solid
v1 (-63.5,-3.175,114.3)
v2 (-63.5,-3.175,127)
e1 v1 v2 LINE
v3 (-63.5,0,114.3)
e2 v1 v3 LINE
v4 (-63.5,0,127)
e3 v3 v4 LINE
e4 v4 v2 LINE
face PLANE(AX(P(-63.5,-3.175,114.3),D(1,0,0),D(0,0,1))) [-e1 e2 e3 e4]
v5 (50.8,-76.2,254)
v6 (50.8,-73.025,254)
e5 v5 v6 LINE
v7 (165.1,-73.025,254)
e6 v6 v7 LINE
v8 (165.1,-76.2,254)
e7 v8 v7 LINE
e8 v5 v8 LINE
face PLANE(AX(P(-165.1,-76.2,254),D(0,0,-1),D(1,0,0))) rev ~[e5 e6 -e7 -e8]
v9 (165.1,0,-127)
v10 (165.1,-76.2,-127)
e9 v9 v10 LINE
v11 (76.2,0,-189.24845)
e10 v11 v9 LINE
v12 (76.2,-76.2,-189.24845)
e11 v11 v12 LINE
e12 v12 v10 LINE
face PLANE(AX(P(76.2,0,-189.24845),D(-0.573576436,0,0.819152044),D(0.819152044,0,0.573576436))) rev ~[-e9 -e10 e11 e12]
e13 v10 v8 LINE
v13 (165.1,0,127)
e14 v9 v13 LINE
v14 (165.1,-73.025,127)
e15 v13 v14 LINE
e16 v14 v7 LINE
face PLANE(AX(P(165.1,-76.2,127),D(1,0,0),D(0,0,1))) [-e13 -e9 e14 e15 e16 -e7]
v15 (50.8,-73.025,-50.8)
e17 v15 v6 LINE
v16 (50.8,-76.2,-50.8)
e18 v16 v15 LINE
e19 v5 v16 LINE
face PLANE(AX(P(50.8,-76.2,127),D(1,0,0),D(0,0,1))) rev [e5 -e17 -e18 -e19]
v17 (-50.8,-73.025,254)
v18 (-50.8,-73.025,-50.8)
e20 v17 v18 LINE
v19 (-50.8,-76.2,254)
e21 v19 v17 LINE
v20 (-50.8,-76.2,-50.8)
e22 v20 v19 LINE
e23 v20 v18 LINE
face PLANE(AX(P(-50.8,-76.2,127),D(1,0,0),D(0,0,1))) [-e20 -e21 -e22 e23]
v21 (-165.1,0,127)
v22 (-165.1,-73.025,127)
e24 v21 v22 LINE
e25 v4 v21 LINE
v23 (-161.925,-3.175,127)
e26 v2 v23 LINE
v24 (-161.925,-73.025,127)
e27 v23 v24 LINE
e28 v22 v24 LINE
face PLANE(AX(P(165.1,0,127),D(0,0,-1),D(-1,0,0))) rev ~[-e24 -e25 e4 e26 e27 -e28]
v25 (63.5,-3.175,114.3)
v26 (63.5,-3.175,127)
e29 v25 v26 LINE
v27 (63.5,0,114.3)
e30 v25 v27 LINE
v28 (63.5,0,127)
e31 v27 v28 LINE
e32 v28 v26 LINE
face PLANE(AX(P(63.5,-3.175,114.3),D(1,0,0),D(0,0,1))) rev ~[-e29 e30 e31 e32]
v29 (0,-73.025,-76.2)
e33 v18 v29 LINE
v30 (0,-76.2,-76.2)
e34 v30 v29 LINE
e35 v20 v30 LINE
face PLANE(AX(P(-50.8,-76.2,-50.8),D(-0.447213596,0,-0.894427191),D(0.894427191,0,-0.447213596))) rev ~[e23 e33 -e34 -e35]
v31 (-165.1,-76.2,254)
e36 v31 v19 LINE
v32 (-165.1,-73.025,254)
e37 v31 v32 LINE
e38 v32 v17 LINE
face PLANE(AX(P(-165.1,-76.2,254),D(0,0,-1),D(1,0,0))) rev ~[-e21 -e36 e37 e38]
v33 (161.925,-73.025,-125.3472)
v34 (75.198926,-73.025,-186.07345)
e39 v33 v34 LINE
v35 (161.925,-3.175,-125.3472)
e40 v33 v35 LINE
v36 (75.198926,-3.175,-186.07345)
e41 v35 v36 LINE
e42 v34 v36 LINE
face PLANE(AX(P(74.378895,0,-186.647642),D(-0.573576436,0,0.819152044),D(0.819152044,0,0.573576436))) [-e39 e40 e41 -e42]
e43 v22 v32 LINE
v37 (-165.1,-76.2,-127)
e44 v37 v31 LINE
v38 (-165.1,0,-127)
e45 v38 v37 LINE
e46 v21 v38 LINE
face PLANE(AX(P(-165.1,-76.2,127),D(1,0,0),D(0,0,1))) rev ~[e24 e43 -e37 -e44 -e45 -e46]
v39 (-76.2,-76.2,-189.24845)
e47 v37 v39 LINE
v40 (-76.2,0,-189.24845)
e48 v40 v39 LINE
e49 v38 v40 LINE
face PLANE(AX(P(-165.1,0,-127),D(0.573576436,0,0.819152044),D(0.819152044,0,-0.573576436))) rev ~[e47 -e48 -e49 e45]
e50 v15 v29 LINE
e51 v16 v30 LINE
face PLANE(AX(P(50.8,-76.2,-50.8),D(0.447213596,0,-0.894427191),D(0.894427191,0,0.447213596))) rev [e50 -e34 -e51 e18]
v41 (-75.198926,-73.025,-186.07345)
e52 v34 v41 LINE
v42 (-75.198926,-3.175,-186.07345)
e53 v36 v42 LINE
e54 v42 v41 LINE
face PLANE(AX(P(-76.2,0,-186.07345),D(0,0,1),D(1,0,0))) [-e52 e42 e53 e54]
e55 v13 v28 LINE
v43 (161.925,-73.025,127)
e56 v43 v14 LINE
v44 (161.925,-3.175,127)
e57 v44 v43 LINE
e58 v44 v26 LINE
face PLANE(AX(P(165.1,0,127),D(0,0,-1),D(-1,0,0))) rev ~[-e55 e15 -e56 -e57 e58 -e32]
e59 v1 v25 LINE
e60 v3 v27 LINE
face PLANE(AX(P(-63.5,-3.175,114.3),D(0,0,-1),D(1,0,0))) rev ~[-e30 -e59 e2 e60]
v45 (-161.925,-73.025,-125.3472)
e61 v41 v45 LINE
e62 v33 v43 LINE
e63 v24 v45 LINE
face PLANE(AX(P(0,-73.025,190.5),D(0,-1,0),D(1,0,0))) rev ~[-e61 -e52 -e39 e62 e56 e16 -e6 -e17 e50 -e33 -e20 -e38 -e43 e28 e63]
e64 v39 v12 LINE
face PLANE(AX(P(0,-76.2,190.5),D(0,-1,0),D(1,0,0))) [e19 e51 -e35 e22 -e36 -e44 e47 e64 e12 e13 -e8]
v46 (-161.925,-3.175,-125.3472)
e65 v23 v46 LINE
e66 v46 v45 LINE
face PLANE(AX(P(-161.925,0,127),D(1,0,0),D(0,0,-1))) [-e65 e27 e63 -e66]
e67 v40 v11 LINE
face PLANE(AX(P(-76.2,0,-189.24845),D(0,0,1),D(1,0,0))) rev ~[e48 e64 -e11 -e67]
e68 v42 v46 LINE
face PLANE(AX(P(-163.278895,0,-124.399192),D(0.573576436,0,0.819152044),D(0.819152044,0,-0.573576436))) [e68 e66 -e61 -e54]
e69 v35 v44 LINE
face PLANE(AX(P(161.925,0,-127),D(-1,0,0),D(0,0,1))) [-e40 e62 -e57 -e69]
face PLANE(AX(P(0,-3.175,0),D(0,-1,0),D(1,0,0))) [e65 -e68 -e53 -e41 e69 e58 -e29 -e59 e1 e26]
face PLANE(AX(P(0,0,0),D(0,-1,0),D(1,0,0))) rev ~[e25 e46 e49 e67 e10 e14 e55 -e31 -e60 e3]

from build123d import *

# Parameters (mm, degrees)
F1_DEPTH  = 76.2
F2_T      = -3.175
F4_DEPTH  = 25.4
F5_W      = 127
F5_H      = 25.4
F6_DEPTH  = 25.4
F7_W      = 330.2
F7_H      = 127
F8_DEPTH  = 3.175
F9_W      = 101.6
F9_H      = 127
F10_DEPTH = 25.4


# Not quite as in the source:
# - a pattern or mirror of a feature is missing from the dataset's text; its kind, count and spacing are read off the source's solid


with BuildPart() as f1:
    # F0 (on Front) → F1 (new body)
    with BuildSketch(Plane.XZ):
        with BuildLine():
            ThreePointArc((-1.539e-07, -127), (89.8025611563, -89.8025612651), (127, 0))
            ThreePointArc((127, 0), (89.8025612186, 89.8025612028), (2.24e-08, 127))
            ThreePointArc((2.24e-08, 127), (-127, 8.82e-08), (-1.539e-07, -127))
        make_face()
        with BuildLine():
            ThreePointArc((2.24e-08, 127), (89.8025612186, 89.8025612028), (127, 0))
            ThreePointArc((127, 0), (89.8025611563, -89.8025612651), (-1.539e-07, -127))
            Line((-1.539e-07, -127), (165.1, -127))
            Line((165.1, -127), (165.1, 127))
            Line((165.1, 127), (2.24e-08, 127))
        make_face()
        with BuildLine():
            ThreePointArc((-1.539e-07, -127), (-127, 8.82e-08), (2.24e-08, 127))
            Line((2.24e-08, 127), (-165.1, 127))
            Line((-165.1, 127), (-165.1, -127))
            Line((-165.1, -127), (-1.539e-07, -127))
        make_face()
        Polygon((165.1, -127), (-1.539e-07, -127), (-165.1, -127), (-76.2, -189.2484501468), (76.2, -189.2484501468), align=None)
    extrude(amount=F1_DEPTH)

    # F2
    f2_openings = [f1.faces().sort_by_distance(p)[0] for p in [
        (0, -38.1, 127),
    ]]
    offset(amount=F2_T, openings=f2_openings)

    # F3 (on face) → F4 (cut)
    with BuildSketch(Plane.XZ.offset(76.2)):
        Polygon((0, -76.2), (0, 127), (-50.8, 127), (-50.8, -50.8), align=None)
    f4 = extrude(amount=-F4_DEPTH, mode=Mode.SUBTRACT)

    # F4_copies: F4 across plane
    add(f4.mirror(Plane(origin=(0, 0, 0), x_dir=(0, 0, 1), z_dir=(1, 0, 0))), mode=Mode.SUBTRACT)

    # F5 (on face) → F6 (cut)
    with BuildSketch(Plane.XZ.offset(3.175)):
        with Locations((0, 127)):
            Rectangle(F5_W, F5_H)
    extrude(amount=-F6_DEPTH, mode=Mode.SUBTRACT)

    # F7 (on face) → F8 (join)
    with BuildSketch(Plane.XZ.offset(76.2)):
        with Locations((0, 190.5)):
            Rectangle(F7_W, F7_H)
    extrude(amount=-F8_DEPTH)

    # F9 (on face) → F10 (cut)
    with BuildSketch(Plane.XZ.offset(76.2)):
        with Locations((0, 190.5)):
            Rectangle(F9_W, F9_H)
    extrude(amount=-F10_DEPTH, mode=Mode.SUBTRACT)


solid = f1.part
